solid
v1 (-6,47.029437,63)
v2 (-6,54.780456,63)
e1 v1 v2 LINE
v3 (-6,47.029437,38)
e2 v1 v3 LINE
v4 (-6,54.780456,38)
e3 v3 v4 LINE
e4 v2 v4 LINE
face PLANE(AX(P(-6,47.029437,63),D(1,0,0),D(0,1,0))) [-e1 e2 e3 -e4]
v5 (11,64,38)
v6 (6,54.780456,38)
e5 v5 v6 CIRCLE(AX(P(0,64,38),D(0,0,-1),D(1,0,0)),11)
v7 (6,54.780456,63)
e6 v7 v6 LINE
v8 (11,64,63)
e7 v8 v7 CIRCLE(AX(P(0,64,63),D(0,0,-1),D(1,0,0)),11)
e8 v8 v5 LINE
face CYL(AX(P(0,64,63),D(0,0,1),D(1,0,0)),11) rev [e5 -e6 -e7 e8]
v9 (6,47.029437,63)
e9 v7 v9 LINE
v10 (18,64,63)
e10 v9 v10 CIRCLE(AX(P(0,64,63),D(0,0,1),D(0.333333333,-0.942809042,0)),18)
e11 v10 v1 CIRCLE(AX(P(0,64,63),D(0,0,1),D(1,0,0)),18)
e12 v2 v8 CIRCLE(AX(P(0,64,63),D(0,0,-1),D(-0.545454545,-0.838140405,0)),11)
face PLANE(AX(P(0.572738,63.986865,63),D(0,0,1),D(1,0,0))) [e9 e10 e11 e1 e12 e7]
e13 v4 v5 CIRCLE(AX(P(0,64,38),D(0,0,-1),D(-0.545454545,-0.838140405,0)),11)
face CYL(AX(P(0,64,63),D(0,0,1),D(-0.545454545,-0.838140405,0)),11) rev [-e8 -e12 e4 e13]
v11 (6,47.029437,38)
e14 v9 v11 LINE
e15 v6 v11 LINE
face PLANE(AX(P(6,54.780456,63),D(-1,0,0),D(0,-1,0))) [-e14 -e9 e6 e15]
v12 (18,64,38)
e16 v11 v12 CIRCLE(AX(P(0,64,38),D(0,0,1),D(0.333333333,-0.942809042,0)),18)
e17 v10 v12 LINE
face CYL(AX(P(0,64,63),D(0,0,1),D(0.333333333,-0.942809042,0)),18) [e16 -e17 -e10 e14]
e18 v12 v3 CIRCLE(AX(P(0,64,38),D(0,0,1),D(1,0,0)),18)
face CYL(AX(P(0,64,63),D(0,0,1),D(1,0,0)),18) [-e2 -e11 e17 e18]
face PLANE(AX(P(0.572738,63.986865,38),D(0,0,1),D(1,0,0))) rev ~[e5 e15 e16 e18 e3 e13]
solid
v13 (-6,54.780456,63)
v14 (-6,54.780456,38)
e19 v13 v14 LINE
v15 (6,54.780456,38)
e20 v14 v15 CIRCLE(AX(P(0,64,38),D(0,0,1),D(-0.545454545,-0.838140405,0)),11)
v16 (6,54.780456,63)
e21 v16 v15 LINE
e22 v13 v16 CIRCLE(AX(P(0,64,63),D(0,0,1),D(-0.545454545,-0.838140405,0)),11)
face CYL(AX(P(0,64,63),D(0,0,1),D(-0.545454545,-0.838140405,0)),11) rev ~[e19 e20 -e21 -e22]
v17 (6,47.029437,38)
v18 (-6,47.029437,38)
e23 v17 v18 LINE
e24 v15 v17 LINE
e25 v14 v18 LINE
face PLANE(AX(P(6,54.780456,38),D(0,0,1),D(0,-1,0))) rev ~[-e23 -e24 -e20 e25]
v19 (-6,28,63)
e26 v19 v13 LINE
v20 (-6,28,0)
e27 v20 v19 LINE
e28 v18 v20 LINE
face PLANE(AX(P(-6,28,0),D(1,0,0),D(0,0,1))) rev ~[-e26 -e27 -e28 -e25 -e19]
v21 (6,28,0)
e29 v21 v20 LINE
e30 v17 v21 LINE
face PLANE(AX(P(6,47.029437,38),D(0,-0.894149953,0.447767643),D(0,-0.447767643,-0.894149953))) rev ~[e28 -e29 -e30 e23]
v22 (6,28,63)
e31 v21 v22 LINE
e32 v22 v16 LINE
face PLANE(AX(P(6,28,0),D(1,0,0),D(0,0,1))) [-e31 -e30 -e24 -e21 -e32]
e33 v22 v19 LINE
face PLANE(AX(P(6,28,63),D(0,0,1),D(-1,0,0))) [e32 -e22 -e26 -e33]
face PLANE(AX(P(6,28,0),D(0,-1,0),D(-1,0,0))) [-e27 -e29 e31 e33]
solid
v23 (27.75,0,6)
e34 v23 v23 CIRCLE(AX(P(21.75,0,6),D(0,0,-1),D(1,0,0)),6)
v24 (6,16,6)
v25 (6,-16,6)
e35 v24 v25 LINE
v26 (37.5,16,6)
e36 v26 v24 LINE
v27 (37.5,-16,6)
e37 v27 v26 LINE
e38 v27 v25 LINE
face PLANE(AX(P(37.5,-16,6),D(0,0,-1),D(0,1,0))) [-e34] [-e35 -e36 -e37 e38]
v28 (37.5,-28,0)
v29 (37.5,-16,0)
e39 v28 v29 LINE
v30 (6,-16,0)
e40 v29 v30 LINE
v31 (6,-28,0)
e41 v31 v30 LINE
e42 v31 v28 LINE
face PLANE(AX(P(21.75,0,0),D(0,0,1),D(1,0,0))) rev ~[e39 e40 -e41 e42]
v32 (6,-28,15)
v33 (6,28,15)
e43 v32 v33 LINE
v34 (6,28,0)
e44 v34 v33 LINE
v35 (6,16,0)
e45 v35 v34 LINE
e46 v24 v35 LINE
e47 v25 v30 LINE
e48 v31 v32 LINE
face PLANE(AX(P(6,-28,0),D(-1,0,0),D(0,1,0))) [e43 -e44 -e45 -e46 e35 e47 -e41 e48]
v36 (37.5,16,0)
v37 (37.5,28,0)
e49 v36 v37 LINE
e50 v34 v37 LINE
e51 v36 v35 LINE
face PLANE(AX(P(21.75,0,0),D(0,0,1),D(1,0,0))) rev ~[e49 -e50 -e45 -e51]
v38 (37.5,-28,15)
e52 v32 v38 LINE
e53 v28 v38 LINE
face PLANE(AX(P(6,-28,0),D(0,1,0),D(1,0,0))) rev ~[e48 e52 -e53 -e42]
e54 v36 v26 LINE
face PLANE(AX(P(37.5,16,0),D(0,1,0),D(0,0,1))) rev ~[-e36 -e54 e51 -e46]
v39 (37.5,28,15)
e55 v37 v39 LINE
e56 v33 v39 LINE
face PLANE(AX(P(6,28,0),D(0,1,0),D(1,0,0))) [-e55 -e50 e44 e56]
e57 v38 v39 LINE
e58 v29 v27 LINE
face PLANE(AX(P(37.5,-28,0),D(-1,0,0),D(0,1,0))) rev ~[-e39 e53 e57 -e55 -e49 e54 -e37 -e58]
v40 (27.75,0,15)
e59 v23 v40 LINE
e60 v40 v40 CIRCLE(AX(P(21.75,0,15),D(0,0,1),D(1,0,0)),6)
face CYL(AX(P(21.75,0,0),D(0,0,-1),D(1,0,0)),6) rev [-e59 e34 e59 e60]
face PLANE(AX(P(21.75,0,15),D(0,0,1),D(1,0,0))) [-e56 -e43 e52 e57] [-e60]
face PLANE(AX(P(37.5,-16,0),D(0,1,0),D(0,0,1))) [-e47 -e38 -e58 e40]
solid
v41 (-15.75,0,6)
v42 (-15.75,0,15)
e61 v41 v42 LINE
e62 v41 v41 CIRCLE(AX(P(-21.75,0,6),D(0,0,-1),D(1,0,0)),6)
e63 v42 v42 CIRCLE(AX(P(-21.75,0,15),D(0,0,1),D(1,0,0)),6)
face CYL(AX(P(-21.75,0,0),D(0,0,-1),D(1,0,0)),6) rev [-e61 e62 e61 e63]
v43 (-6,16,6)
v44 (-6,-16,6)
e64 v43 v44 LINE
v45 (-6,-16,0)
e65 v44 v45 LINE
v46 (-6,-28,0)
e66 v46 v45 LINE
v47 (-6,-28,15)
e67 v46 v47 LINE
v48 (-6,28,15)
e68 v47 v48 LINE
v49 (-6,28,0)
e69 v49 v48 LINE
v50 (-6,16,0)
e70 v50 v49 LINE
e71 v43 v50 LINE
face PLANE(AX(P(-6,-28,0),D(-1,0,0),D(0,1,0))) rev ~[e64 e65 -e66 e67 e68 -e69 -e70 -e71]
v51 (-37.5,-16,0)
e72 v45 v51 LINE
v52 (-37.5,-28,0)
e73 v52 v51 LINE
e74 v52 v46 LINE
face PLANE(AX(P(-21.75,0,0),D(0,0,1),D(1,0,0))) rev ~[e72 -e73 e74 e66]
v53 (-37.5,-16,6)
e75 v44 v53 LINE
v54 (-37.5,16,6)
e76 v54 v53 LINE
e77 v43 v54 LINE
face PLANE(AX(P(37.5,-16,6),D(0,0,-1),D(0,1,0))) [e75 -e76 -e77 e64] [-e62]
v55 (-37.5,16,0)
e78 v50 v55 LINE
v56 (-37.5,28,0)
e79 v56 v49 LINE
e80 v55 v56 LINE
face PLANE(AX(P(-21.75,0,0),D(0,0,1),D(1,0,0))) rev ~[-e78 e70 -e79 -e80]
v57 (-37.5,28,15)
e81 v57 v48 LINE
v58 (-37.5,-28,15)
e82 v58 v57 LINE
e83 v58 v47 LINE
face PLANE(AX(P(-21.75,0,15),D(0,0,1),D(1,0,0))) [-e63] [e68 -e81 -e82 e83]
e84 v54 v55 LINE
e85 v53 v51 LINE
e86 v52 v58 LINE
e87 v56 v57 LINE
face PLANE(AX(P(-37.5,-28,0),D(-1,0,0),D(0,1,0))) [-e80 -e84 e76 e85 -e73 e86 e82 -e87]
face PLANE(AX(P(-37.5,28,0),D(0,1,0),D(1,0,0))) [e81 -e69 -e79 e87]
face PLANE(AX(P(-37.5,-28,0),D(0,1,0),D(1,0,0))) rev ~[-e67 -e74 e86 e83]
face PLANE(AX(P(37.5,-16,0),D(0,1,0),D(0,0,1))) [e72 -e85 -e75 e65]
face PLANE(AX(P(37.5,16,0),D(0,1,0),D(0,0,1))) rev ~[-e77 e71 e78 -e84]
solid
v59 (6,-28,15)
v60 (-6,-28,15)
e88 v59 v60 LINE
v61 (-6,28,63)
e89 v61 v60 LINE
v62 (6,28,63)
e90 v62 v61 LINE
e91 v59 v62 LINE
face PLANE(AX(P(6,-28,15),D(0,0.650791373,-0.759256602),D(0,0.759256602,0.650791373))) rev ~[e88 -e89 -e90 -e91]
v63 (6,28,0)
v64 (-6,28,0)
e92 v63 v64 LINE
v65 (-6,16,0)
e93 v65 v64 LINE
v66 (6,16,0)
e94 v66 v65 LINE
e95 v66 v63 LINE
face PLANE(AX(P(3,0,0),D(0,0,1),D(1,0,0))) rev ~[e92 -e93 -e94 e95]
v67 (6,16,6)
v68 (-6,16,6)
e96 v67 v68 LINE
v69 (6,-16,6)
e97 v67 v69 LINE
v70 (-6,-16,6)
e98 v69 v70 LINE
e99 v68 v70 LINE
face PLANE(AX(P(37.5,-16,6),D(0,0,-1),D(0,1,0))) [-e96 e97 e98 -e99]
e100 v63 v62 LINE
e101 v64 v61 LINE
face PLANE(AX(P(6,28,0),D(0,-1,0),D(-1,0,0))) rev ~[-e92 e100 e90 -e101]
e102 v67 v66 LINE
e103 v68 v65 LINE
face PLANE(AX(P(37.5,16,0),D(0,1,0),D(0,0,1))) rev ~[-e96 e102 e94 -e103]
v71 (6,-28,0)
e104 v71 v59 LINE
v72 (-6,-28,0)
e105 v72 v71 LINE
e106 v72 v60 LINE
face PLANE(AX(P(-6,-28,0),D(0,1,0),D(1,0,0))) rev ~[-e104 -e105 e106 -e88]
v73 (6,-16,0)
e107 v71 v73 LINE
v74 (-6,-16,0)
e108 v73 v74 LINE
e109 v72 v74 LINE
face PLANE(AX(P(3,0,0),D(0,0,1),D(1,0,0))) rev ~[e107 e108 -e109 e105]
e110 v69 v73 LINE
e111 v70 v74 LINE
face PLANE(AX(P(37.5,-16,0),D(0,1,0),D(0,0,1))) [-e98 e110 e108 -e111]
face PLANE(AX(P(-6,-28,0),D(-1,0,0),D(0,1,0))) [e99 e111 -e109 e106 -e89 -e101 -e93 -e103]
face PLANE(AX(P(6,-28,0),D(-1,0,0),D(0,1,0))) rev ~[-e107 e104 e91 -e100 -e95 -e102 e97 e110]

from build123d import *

# Parameters (mm, degrees)
F0_W      = 31.5
F0_H      = 56
F0_R      = 6
F1_DEPTH  = 15
F0_W_2    = 6
F2_DEPTH  = 63
F4_DEPTH  = 25
F5_DEPTH  = 36
F7_DEPTH  = 91.3
F8_DEPTH  = 25
F10_DEPTH = 25
F11_W     = 32
F11_H     = 6
F12_DEPTH = 107.5


with BuildPart() as f1:
    # F0 (on Top) → F1 (new body)
    with BuildSketch(Plane.XY):
        with Locations((-21.75, 0)):
            Rectangle(F0_W, F0_H)
        with Locations((-21.75, 0)):
            Circle(F0_R, mode=Mode.SUBTRACT)
    extrude(amount=F1_DEPTH)


with BuildPart() as f1b:
    # F0 (on Top) → F1, piece 2 (new body)
    with BuildSketch(Plane.XY):
        with Locations((21.75, 0)):
            Rectangle(F0_W, F0_H)
        with Locations((21.75, 0)):
            Circle(F0_R, mode=Mode.SUBTRACT)
    extrude(amount=F1_DEPTH)


with BuildPart() as f2:
    # F0 (on Top) → F2 (new body)
    with BuildSketch(Plane.XY):
        with Locations((3, 0)):
            Rectangle(F0_W_2, F0_H)
        with Locations((-3, 0)):
            Rectangle(F0_W_2, F0_H)
    extrude(amount=F2_DEPTH)

    # F3 (on face) → F4 (cut)
    with BuildSketch(Plane.YZ.offset(6)):
        Polygon((-28, 63), (-28, 15), (28, 63), align=None)
    extrude(amount=-F4_DEPTH, mode=Mode.SUBTRACT)


with BuildPart() as f5:
    # F5 (new): a face of the model
    f5_faces = [f2.part.faces().sort_by_distance(p)[0] for p in [
        (0, 28, 31.5),
    ]]
    extrude(f5_faces, amount=F5_DEPTH)

    # F6 (on face) → F7 (cut)
    with BuildSketch(Plane.XY.offset(63)):
        with BuildLine():
            Line((-6, 64), (-6, 54.7804555427))
            ThreePointArc((-6, 54.7804555427), (0, 53), (6, 54.7804555427))
            Line((6, 54.7804555427), (6, 64))
            Line((6, 64), (-6, 64))
        make_face()
    extrude(amount=-F7_DEPTH, mode=Mode.SUBTRACT)

    # F9 (on face) → F10 (cut)
    with BuildSketch(Plane.YZ.offset(6)):
        Polygon((47.0294372515, 38), (28, 0), (54.7804555427, 0), (54.7804555427, 38), align=None)
    extrude(amount=-F10_DEPTH, mode=Mode.SUBTRACT)


with BuildPart() as f8:
    # F6 (on face) → F8 (new body)
    with BuildSketch(Plane.XY.offset(63)):
        with BuildLine():
            ThreePointArc((-6, 54.7804555427), (-5.2440442409, 73.6695398029), (11, 64))
            ThreePointArc((11, 64), (9.6695398029, 58.7559557591), (6, 54.7804555427))
            Line((6, 54.7804555427), (6, 47.0294372515))
            ThreePointArc((6, 47.0294372515), (14.6969384567, 53.6076951546), (18, 64))
            ThreePointArc((18, 64), (-10.3923048454, 78.6969384567), (-6, 47.0294372515))
            Line((-6, 47.0294372515), (-6, 54.7804555427))
        make_face()
    extrude(amount=-F8_DEPTH)


with BuildPart() as f12_tool:
    # F11 (on face) → F12 (new body)
    with BuildSketch(Plane.YZ.offset(37.5)):
        with Locations((0, 3)):
            Rectangle(F11_W, F11_H)
    extrude(amount=-F12_DEPTH)


with BuildPart() as f1_1:
    add(f1.part)

    # F12: cut by f12_tool
    add(f12_tool.part, mode=Mode.SUBTRACT)


with BuildPart() as f1b_1:
    add(f1b.part)

    # F12: cut by f12_tool
    add(f12_tool.part, mode=Mode.SUBTRACT)


with BuildPart() as f2_1:
    add(f2.part)

    # F12: cut by f12_tool
    add(f12_tool.part, mode=Mode.SUBTRACT)


solid = Compound([f5.part, f8.part, f1_1.part, f1b_1.part, f2_1.part])
